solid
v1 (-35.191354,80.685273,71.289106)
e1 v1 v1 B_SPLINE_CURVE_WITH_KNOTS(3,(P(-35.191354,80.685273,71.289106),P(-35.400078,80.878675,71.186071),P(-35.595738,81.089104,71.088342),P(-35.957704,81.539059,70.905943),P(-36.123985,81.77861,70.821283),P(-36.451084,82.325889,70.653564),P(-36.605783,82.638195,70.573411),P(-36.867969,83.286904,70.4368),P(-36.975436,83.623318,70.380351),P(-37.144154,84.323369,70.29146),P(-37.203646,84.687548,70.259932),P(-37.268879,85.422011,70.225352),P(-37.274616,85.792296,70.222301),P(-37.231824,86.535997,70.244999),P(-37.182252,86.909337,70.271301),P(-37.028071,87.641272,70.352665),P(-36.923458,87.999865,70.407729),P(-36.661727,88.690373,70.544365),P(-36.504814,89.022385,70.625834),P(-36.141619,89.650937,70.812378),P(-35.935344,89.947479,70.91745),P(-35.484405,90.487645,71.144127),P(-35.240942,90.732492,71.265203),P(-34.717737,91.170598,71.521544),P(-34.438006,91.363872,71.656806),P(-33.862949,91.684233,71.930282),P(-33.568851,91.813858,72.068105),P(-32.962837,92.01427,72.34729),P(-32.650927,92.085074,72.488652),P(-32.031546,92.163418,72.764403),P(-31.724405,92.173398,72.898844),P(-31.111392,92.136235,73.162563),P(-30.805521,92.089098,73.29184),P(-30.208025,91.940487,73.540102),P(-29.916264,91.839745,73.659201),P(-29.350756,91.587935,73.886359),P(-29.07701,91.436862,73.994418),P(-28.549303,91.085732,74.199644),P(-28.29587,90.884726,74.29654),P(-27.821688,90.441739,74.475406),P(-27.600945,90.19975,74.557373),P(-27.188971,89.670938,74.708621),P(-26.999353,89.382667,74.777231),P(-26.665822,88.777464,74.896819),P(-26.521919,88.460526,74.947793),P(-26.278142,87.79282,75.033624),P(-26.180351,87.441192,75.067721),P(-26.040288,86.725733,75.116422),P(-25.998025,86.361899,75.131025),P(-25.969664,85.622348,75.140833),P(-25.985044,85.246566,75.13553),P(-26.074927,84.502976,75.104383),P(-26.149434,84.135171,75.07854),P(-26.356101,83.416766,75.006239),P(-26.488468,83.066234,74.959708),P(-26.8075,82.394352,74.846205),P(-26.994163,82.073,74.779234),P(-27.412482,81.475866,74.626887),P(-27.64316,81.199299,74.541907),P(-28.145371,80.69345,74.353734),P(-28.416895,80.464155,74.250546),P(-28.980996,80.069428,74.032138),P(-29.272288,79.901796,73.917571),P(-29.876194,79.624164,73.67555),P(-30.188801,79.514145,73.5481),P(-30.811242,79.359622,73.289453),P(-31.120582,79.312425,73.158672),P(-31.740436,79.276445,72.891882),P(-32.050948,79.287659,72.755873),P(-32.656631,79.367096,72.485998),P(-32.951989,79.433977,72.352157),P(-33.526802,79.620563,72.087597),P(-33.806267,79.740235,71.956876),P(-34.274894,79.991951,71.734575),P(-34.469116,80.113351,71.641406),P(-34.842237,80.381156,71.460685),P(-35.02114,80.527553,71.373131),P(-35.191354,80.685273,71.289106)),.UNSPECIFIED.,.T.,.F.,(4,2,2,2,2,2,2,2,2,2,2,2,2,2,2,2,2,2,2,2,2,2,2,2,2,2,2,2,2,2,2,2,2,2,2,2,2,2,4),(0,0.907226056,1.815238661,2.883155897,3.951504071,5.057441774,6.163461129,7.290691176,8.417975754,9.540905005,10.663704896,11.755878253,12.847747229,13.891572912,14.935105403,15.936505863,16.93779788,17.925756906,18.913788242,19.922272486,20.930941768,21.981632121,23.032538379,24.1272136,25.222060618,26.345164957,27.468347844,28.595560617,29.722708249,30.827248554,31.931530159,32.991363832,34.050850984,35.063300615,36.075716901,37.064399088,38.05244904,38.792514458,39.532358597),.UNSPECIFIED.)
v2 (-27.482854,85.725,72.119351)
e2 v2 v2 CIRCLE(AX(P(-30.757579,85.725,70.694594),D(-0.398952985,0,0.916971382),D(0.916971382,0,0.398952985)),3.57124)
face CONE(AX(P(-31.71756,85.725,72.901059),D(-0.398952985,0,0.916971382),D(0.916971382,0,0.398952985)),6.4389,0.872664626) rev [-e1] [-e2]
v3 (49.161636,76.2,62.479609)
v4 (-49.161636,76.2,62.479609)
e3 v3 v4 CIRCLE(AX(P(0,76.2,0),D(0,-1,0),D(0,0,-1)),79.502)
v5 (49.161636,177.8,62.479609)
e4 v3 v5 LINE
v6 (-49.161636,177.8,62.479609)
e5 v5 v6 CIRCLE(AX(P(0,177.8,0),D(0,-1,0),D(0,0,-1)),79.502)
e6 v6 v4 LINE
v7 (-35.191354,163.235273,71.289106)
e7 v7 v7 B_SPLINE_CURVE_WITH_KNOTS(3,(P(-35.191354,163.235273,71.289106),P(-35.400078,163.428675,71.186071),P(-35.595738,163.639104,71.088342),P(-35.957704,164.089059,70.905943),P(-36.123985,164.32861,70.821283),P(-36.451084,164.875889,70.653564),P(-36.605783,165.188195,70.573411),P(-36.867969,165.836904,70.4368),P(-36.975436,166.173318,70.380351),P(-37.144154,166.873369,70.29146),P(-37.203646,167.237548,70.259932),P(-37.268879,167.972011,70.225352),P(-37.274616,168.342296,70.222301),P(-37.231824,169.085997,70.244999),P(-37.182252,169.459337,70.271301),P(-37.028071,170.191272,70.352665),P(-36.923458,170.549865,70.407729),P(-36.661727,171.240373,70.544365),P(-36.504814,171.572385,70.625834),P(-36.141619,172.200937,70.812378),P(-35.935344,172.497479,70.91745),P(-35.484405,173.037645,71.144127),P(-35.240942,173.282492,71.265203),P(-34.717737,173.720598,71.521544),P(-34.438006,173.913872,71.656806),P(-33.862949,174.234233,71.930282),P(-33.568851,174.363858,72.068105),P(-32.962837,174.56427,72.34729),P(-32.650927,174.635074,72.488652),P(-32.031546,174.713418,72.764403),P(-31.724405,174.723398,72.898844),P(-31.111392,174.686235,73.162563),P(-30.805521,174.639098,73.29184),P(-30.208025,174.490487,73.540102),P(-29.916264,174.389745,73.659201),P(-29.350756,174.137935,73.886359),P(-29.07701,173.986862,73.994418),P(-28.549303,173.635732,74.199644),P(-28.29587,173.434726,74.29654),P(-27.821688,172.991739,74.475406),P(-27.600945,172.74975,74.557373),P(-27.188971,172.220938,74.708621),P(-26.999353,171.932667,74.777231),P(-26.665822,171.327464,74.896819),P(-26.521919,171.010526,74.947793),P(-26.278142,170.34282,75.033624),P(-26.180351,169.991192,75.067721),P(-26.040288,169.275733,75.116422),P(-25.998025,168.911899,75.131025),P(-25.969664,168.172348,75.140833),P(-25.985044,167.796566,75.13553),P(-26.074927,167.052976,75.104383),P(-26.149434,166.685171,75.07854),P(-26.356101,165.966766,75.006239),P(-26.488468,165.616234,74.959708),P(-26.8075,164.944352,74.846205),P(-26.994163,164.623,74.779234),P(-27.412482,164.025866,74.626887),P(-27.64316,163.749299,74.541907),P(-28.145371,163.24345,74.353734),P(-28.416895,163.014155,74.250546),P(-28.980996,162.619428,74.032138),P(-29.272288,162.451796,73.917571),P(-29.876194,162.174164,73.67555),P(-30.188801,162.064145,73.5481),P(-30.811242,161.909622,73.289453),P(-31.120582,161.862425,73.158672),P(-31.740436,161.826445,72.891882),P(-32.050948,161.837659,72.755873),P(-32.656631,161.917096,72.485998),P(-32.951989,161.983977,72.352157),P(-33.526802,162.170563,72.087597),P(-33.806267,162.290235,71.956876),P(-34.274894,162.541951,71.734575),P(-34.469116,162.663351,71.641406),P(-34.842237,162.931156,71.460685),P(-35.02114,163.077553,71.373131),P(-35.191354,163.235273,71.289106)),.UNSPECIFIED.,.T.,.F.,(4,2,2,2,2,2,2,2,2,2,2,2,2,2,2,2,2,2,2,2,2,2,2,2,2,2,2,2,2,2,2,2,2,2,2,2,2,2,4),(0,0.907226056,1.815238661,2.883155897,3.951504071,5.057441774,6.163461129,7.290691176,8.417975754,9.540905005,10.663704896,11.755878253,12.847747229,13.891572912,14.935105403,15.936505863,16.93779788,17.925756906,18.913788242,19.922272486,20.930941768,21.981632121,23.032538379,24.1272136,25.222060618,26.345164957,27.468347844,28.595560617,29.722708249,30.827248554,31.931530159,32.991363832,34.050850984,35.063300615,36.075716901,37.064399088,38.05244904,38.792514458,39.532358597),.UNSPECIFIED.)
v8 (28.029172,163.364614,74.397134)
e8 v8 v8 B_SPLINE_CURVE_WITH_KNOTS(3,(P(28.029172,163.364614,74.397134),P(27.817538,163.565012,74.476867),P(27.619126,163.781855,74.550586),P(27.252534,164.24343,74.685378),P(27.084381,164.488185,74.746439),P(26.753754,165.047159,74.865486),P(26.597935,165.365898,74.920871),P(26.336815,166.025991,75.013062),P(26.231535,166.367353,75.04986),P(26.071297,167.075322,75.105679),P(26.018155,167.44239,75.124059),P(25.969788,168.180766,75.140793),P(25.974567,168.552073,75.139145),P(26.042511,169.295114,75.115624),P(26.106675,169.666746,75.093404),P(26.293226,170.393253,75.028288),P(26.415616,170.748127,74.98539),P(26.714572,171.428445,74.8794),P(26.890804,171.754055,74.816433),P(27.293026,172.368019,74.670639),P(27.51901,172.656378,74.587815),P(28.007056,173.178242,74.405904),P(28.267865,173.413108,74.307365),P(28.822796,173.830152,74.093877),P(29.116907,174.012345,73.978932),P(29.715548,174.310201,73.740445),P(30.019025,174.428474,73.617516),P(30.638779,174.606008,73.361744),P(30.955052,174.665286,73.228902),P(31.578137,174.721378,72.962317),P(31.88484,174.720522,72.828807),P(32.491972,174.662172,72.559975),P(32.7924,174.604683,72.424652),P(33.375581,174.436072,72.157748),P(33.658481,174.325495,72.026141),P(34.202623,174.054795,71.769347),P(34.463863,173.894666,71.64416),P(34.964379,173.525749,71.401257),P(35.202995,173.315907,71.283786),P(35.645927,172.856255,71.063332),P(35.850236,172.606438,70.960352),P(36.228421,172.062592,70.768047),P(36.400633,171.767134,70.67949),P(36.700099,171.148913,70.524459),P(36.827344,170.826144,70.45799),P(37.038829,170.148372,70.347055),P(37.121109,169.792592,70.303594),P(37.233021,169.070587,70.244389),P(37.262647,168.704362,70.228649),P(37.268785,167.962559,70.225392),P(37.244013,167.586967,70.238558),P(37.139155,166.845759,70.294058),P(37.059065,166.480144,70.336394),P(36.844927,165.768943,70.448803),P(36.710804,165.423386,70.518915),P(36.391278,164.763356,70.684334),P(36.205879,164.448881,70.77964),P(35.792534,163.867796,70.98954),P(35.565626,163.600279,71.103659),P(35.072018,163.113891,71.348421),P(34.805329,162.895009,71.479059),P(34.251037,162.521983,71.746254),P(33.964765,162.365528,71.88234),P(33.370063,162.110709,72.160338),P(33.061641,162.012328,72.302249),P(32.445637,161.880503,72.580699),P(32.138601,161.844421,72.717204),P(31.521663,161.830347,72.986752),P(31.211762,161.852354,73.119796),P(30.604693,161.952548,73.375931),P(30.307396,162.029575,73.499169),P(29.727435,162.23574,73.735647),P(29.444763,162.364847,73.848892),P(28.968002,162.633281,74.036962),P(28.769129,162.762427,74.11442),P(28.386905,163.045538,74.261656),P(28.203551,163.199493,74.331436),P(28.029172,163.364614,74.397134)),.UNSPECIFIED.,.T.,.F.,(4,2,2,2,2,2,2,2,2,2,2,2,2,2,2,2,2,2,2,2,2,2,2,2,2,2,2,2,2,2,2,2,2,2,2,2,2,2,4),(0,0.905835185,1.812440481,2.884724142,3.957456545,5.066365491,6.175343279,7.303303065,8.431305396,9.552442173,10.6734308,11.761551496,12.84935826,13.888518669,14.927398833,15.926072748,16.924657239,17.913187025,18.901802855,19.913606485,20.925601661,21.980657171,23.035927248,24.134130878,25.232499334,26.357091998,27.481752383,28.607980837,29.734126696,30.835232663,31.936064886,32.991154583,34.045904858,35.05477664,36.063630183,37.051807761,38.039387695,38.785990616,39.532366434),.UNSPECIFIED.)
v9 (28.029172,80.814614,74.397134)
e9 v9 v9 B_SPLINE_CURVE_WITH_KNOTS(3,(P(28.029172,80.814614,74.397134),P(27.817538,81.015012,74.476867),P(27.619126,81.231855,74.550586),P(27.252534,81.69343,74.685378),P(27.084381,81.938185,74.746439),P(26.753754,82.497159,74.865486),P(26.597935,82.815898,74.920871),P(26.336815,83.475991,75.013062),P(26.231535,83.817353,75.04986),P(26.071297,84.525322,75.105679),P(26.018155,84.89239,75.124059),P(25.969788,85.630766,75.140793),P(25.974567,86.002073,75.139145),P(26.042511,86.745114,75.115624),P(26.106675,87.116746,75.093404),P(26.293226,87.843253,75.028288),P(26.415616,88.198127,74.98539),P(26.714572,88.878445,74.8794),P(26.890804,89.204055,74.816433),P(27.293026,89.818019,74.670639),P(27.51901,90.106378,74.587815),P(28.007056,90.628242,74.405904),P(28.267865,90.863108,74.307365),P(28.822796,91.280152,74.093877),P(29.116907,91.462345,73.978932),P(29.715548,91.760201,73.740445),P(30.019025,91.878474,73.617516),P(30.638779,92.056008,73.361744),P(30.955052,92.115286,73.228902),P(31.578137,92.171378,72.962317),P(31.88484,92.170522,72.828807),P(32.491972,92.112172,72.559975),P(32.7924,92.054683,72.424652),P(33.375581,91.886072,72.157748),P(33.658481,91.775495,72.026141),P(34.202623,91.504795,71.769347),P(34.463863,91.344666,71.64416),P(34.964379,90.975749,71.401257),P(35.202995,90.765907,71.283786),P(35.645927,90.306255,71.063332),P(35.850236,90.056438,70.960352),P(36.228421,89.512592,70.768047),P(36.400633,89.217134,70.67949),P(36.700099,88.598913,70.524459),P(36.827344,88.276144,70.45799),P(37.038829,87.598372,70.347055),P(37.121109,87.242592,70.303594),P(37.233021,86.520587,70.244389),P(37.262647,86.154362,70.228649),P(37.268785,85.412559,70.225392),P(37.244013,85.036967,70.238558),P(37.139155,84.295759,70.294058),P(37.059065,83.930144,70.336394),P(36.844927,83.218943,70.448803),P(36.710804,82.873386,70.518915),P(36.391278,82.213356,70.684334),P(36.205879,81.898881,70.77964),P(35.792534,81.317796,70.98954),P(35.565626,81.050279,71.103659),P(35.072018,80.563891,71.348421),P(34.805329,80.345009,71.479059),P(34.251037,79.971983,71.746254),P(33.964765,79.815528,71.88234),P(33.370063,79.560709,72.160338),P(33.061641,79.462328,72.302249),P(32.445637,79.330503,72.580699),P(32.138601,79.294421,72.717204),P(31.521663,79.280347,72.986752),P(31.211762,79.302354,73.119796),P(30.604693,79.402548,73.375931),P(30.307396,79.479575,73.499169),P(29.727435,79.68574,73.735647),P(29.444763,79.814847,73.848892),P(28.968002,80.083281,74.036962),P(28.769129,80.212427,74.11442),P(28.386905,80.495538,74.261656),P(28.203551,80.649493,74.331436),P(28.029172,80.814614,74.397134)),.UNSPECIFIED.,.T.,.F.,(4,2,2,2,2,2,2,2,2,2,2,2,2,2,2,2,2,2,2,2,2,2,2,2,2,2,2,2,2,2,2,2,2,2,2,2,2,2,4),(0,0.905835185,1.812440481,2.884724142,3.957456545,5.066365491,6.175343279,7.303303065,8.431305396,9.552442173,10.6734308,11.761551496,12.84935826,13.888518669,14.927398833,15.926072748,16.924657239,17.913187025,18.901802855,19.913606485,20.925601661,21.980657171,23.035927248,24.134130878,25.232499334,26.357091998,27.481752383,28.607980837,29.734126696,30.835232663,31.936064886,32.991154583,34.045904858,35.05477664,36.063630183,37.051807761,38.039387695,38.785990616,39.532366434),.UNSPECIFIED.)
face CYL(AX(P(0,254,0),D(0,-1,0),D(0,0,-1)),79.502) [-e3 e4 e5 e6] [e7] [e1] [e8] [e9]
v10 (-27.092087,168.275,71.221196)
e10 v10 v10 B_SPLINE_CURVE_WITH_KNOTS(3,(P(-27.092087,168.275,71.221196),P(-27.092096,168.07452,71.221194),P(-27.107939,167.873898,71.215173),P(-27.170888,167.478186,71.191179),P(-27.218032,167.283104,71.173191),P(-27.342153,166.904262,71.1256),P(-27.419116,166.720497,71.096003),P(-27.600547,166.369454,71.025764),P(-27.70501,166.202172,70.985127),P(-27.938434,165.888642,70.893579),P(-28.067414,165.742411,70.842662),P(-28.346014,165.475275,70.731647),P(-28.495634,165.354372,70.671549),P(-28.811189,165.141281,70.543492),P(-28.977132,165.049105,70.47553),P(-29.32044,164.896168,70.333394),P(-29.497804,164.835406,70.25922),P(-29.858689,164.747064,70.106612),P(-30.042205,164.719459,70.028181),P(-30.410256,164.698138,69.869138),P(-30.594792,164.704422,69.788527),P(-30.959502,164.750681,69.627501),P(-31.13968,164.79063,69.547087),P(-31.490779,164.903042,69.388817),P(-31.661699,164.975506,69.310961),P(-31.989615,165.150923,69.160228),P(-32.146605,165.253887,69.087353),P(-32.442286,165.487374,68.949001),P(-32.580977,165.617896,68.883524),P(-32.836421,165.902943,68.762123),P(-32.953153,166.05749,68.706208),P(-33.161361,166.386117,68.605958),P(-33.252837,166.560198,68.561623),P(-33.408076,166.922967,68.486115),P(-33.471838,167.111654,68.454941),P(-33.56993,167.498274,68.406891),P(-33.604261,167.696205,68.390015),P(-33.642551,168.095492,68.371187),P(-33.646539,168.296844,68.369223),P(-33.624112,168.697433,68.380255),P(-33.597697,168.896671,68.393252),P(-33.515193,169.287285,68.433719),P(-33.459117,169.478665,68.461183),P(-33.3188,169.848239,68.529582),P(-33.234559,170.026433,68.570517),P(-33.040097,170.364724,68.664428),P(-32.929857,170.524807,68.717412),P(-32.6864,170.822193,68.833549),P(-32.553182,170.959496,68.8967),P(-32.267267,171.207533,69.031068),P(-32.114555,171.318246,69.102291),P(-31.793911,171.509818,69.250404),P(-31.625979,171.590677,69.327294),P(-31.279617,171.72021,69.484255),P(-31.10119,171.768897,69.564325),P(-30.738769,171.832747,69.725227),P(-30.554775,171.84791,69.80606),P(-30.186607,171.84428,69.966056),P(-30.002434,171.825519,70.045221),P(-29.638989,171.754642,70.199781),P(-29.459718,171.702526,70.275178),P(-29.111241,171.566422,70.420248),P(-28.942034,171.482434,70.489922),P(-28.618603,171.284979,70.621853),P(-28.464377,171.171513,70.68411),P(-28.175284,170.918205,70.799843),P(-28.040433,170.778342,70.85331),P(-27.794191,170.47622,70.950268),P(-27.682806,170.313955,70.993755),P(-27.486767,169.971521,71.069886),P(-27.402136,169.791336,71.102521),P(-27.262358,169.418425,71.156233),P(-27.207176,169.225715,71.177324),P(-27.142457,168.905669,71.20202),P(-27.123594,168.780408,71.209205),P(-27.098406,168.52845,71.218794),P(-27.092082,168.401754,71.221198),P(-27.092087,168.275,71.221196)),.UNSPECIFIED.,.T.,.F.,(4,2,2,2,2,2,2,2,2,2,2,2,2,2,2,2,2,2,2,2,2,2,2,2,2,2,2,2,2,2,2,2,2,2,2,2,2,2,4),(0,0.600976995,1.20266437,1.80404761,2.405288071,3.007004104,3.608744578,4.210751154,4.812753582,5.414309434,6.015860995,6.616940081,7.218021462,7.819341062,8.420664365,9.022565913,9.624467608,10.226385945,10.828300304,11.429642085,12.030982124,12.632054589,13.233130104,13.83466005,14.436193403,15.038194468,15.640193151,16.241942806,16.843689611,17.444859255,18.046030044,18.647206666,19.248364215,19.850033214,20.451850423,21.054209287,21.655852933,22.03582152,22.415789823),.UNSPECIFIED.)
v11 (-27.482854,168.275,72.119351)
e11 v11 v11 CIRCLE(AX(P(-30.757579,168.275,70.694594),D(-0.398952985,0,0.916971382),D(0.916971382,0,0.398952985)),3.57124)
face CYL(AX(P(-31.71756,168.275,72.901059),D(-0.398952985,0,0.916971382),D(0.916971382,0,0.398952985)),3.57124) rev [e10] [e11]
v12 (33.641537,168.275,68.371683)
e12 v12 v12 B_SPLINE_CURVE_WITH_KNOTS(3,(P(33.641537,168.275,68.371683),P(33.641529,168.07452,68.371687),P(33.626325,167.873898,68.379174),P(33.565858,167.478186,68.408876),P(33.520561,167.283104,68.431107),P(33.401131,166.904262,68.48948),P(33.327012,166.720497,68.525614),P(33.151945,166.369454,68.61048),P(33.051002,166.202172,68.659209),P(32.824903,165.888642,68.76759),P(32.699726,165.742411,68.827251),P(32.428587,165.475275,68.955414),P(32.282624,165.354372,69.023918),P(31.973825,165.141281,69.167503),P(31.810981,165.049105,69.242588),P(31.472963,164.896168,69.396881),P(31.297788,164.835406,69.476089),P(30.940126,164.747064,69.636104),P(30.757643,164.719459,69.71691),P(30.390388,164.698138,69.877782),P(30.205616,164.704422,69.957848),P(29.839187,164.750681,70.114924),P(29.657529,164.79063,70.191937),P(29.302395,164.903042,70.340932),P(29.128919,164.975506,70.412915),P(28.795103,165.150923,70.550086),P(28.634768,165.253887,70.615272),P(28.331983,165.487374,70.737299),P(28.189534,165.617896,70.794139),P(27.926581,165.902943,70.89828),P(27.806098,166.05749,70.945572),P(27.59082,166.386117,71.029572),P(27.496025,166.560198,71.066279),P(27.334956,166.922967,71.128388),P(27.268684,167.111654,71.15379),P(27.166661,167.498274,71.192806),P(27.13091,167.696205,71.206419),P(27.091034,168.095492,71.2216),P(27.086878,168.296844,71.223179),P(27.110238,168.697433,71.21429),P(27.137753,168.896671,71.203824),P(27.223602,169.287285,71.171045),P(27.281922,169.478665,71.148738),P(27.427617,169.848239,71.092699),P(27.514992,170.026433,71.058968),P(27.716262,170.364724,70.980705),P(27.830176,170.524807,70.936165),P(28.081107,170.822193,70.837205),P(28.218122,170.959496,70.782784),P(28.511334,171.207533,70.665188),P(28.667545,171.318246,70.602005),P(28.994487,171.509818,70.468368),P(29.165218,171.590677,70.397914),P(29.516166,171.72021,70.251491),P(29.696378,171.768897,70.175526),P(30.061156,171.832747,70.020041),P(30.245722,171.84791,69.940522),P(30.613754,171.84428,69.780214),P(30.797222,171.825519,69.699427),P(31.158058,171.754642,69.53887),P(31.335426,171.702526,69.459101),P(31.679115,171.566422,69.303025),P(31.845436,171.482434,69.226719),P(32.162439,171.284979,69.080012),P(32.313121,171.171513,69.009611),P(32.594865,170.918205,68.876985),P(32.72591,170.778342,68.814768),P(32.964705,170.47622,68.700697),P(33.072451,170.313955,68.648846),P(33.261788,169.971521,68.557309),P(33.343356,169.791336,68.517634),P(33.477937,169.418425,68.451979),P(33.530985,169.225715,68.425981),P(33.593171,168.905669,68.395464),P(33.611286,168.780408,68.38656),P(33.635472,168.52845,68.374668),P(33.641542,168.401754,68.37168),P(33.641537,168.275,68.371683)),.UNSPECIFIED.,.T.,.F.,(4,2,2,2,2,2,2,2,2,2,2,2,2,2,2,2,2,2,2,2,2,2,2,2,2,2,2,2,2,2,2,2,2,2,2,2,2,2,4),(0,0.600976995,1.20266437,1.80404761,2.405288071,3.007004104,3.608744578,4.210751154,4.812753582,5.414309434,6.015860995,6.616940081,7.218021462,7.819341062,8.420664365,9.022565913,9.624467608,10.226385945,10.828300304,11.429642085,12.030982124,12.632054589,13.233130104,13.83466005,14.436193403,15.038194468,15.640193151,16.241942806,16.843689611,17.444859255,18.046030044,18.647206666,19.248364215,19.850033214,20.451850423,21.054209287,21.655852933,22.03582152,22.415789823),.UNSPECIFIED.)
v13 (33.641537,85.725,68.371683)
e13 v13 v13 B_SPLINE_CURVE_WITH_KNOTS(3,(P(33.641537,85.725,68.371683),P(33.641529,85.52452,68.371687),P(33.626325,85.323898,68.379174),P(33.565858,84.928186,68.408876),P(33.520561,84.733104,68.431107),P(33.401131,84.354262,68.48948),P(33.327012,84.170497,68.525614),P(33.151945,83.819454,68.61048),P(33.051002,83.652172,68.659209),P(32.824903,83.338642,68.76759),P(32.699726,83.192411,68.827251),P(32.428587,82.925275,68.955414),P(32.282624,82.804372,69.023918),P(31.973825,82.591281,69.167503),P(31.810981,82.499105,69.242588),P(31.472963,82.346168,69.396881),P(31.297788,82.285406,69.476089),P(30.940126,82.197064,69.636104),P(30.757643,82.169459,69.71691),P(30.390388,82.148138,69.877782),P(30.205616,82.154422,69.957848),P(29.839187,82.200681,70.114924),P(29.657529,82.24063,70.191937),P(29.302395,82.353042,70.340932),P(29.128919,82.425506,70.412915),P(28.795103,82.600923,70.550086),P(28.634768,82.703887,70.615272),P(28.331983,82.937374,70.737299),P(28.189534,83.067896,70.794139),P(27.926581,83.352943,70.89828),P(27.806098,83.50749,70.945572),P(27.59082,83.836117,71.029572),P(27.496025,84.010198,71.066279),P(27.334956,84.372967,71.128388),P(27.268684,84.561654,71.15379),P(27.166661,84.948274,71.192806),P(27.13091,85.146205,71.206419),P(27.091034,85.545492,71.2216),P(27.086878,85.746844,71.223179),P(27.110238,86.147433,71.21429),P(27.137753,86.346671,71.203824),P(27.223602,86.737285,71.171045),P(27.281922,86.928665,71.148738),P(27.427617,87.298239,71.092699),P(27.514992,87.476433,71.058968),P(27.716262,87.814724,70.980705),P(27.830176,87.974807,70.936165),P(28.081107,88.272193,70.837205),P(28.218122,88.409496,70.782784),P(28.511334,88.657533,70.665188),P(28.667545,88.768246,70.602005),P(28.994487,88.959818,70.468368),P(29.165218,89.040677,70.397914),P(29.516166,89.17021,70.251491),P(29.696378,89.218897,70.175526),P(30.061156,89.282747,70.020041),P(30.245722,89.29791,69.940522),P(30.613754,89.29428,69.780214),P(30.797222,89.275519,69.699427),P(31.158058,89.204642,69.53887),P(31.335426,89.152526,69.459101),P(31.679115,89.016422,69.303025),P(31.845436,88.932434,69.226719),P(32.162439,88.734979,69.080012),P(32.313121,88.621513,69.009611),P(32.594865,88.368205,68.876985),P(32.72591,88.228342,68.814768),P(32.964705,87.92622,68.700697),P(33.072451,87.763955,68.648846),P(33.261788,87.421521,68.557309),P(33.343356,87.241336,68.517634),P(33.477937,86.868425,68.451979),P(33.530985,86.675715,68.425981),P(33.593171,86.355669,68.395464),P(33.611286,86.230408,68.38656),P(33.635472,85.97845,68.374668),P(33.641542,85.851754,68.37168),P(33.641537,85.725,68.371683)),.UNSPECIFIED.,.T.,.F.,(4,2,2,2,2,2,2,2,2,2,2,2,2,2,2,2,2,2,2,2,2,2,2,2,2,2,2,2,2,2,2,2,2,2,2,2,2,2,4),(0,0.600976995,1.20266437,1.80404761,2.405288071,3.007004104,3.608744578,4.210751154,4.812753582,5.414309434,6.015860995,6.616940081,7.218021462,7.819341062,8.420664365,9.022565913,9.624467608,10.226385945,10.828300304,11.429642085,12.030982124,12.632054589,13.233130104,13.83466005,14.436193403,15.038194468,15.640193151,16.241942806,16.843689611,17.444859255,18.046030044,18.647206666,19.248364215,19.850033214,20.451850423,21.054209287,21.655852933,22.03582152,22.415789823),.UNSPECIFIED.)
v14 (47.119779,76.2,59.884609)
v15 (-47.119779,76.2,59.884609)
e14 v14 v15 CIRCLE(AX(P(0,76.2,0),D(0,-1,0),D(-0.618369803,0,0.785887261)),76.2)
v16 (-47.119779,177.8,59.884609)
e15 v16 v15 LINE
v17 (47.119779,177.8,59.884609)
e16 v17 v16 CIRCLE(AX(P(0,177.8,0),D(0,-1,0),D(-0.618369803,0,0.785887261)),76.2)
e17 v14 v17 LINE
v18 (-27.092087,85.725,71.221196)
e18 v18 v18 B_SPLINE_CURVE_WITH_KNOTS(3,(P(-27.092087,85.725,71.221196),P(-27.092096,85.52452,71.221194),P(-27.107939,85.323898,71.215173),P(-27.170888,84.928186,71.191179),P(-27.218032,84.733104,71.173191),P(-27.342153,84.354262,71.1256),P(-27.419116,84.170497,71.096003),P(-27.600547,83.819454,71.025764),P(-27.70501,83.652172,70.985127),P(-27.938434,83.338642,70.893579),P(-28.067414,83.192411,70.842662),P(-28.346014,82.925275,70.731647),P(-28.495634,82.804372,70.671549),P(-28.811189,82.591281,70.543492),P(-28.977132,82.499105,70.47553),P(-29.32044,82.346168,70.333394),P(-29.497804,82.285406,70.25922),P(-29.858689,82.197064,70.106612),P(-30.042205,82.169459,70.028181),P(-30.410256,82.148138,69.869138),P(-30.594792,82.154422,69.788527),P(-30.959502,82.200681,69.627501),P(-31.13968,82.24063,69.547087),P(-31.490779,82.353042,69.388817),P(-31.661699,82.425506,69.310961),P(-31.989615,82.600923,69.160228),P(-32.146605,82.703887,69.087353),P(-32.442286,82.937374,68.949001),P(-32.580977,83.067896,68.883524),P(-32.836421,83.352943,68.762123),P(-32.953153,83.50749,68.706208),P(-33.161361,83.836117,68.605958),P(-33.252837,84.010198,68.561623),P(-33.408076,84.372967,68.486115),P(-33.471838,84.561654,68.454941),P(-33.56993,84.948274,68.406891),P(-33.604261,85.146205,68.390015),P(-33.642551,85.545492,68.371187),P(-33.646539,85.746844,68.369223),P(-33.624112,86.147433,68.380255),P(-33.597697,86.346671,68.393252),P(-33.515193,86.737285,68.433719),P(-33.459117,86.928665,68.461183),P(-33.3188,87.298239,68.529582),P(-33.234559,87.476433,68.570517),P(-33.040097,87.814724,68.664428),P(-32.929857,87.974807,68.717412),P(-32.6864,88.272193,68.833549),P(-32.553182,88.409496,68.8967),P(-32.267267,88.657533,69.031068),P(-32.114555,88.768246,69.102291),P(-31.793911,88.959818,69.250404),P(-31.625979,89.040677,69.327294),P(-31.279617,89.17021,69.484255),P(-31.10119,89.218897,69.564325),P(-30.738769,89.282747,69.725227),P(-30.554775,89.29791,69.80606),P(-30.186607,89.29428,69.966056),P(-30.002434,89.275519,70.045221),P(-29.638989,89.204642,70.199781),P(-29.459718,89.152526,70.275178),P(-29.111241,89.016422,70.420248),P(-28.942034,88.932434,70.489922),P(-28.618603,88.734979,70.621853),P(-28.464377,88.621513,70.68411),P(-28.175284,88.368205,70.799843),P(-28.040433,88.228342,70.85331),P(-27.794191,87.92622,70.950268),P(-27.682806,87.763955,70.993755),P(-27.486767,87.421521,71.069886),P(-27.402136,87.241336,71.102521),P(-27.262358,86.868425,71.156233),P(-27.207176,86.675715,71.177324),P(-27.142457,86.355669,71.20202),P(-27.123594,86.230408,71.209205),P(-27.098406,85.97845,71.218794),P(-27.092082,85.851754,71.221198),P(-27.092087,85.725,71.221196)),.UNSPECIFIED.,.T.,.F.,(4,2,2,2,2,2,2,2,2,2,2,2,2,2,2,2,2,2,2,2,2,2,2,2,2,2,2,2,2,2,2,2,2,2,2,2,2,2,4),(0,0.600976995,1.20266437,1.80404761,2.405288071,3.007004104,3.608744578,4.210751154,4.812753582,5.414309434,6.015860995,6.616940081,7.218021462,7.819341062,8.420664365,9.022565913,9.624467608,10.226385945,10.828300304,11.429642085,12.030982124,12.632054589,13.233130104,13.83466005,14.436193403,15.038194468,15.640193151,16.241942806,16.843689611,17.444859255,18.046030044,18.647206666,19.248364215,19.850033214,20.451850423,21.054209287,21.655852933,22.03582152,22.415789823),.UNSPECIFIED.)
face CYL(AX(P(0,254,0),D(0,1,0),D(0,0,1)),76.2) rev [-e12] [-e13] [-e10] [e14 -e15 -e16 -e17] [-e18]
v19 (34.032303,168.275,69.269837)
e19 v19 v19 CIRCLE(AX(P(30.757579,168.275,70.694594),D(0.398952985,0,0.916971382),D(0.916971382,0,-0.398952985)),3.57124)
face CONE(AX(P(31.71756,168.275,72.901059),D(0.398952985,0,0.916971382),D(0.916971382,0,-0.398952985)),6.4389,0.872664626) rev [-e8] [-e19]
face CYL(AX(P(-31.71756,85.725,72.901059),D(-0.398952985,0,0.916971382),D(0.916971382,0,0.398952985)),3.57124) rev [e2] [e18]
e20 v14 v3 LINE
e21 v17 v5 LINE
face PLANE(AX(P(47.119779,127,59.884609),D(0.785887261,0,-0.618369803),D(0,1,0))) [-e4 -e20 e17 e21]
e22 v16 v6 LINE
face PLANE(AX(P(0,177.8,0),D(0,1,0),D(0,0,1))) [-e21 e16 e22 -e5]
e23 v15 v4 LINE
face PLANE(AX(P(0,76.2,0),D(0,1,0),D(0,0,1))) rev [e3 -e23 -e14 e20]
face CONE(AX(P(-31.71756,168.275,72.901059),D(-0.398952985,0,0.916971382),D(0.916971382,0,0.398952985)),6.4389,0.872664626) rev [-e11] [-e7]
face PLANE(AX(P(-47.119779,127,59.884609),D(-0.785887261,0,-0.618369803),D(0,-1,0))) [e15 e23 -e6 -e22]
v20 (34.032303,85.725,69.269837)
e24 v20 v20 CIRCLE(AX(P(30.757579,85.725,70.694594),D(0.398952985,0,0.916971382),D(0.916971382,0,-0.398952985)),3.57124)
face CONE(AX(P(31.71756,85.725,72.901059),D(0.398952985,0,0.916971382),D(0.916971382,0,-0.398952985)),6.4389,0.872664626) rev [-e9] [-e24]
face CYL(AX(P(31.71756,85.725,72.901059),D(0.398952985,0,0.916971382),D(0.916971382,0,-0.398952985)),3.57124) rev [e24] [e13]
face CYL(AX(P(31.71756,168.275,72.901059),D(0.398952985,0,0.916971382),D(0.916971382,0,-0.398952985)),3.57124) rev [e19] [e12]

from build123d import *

# Parameters (mm, degrees)
SKETCH1_R           = 76.2
SKETCH1_R_2         = 74.549
BOSS_EXTRUDE1_DEPTH = 254
WRAP2_SECTION_W     = 3.302
WRAP2_SECTION_H     = 101.6
WRAP2_ANGLE         = 76.394372684
SKETCH4_W           = 76.2
SKETCH4_H           = 254


# Read off the part's stored shape, not the designer's step: CSK for 1/4 Flat Head Machine Screw (100)1
with BuildPart() as part:
    # Sketch1 → Boss-Extrude1 (new body)
    with BuildSketch(Plane(origin=(0, 0, 0), x_dir=(1, 0, 0), z_dir=(0, 1, 0))):
        with Locations(Location((0, 0, 0), (0, 0, 270))):
            Circle(SKETCH1_R)
        with Locations(Location((0, 0, 0), (0, 0, 270))):
            Circle(SKETCH1_R_2, mode=Mode.SUBTRACT)
    extrude(amount=BOSS_EXTRUDE1_DEPTH)

    # Wrap2 section (on wrap section) → Wrap2 (revolve)
    with BuildSketch(Plane(origin=(0, 0, 0), x_dir=(0.6183698030697371, 0, 0.7858872607769479), z_dir=(0.7858872607769479, 0, -0.6183698030697371))):
        with Locations((77.851, -127)):
            Rectangle(WRAP2_SECTION_W, WRAP2_SECTION_H)
    revolve(axis=Axis((0, 0, 0), (0, -1, 0)), revolution_arc=WRAP2_ANGLE)

    # Sketch4 → Cut-Revolve1 (revolve, cut)
    with BuildSketch(Plane(origin=(0, 0, 0), x_dir=(0, 0, -1), z_dir=(1, 0, 0))):
        with Locations((38.1, 127)):
            Rectangle(SKETCH4_W, SKETCH4_H)
    revolve(axis=Axis((0, 254, 0), (0, -1, 0)), mode=Mode.SUBTRACT)

    # CSK for 1_4 Flat Head Machine Screw  2 → CSK for 1/4 Flat Head Machine Screw (100)1 (revolve, cut)
    with BuildSketch(Plane(origin=(0, 85.725, 0), x_dir=(0.916971382275524, 0, 0.39895298480863006), z_dir=(0, 1, 0))):
        Polygon((0, -79.50211718), (6.43903965, -79.50211718), (3.57124, -77.095747552), (3.57124, -76.116222895), (0, -76.116222895), align=None)
    revolve(axis=Axis((0, 85.725, 0), (0.3989529848086302, 0, -0.9169713822755242)), mode=Mode.SUBTRACT)

    # CSK for 1_4 Flat Head Machine Screw 3 ou → CSK for 1_4 Flat Head Machine Screw  3 (revolve, cut)
    with BuildSketch(Plane(origin=(0, 85.725, 0), x_dir=(0.9169713822755243, 0, -0.3989529848086292), z_dir=(0, -1, 0))):
        Polygon((6.439064088, 79.502137686), (0, 79.502137686), (0, 76.116222895), (3.57124, 76.116222895), (3.57124, 77.095747552), align=None)
    revolve(axis=Axis((0, 85.725, 0), (0.3989529848086292, 0, 0.9169713822755243)), mode=Mode.SUBTRACT)

    # CSK for 1_4 Flat Head Machine Screw 4 ou → CSK for 1_4 Flat Head Machine Screw  4 (revolve, cut)
    with BuildSketch(Plane(origin=(0, 168.275, 0), x_dir=(0.9169713822755243, 0, -0.3989529848086292), z_dir=(0, -1, 0))):
        Polygon((6.439064088, 79.502137686), (0, 79.502137686), (0, 76.116222895), (3.57124, 76.116222895), (3.57124, 77.095747552), align=None)
    revolve(axis=Axis((0, 168.275, 0), (0.3989529848086292, 0, 0.9169713822755243)), mode=Mode.SUBTRACT)

    # CSK for 1_4 Flat Head Machine Screw 5 ou → CSK for 1_4 Flat Head Machine Screw  5 (revolve, cut)
    with BuildSketch(Plane(origin=(0, 168.275, 0), x_dir=(0.916971382275524, 0, 0.39895298480863006), z_dir=(0, 1, 0))):
        Polygon((0, -79.50211718), (6.43903965, -79.50211718), (3.57124, -77.095747552), (3.57124, -76.116222895), (0, -76.116222895), align=None)
    revolve(axis=Axis((0, 168.275, 0), (0.3989529848086302, 0, -0.9169713822755242)), mode=Mode.SUBTRACT)


solid = part.part
